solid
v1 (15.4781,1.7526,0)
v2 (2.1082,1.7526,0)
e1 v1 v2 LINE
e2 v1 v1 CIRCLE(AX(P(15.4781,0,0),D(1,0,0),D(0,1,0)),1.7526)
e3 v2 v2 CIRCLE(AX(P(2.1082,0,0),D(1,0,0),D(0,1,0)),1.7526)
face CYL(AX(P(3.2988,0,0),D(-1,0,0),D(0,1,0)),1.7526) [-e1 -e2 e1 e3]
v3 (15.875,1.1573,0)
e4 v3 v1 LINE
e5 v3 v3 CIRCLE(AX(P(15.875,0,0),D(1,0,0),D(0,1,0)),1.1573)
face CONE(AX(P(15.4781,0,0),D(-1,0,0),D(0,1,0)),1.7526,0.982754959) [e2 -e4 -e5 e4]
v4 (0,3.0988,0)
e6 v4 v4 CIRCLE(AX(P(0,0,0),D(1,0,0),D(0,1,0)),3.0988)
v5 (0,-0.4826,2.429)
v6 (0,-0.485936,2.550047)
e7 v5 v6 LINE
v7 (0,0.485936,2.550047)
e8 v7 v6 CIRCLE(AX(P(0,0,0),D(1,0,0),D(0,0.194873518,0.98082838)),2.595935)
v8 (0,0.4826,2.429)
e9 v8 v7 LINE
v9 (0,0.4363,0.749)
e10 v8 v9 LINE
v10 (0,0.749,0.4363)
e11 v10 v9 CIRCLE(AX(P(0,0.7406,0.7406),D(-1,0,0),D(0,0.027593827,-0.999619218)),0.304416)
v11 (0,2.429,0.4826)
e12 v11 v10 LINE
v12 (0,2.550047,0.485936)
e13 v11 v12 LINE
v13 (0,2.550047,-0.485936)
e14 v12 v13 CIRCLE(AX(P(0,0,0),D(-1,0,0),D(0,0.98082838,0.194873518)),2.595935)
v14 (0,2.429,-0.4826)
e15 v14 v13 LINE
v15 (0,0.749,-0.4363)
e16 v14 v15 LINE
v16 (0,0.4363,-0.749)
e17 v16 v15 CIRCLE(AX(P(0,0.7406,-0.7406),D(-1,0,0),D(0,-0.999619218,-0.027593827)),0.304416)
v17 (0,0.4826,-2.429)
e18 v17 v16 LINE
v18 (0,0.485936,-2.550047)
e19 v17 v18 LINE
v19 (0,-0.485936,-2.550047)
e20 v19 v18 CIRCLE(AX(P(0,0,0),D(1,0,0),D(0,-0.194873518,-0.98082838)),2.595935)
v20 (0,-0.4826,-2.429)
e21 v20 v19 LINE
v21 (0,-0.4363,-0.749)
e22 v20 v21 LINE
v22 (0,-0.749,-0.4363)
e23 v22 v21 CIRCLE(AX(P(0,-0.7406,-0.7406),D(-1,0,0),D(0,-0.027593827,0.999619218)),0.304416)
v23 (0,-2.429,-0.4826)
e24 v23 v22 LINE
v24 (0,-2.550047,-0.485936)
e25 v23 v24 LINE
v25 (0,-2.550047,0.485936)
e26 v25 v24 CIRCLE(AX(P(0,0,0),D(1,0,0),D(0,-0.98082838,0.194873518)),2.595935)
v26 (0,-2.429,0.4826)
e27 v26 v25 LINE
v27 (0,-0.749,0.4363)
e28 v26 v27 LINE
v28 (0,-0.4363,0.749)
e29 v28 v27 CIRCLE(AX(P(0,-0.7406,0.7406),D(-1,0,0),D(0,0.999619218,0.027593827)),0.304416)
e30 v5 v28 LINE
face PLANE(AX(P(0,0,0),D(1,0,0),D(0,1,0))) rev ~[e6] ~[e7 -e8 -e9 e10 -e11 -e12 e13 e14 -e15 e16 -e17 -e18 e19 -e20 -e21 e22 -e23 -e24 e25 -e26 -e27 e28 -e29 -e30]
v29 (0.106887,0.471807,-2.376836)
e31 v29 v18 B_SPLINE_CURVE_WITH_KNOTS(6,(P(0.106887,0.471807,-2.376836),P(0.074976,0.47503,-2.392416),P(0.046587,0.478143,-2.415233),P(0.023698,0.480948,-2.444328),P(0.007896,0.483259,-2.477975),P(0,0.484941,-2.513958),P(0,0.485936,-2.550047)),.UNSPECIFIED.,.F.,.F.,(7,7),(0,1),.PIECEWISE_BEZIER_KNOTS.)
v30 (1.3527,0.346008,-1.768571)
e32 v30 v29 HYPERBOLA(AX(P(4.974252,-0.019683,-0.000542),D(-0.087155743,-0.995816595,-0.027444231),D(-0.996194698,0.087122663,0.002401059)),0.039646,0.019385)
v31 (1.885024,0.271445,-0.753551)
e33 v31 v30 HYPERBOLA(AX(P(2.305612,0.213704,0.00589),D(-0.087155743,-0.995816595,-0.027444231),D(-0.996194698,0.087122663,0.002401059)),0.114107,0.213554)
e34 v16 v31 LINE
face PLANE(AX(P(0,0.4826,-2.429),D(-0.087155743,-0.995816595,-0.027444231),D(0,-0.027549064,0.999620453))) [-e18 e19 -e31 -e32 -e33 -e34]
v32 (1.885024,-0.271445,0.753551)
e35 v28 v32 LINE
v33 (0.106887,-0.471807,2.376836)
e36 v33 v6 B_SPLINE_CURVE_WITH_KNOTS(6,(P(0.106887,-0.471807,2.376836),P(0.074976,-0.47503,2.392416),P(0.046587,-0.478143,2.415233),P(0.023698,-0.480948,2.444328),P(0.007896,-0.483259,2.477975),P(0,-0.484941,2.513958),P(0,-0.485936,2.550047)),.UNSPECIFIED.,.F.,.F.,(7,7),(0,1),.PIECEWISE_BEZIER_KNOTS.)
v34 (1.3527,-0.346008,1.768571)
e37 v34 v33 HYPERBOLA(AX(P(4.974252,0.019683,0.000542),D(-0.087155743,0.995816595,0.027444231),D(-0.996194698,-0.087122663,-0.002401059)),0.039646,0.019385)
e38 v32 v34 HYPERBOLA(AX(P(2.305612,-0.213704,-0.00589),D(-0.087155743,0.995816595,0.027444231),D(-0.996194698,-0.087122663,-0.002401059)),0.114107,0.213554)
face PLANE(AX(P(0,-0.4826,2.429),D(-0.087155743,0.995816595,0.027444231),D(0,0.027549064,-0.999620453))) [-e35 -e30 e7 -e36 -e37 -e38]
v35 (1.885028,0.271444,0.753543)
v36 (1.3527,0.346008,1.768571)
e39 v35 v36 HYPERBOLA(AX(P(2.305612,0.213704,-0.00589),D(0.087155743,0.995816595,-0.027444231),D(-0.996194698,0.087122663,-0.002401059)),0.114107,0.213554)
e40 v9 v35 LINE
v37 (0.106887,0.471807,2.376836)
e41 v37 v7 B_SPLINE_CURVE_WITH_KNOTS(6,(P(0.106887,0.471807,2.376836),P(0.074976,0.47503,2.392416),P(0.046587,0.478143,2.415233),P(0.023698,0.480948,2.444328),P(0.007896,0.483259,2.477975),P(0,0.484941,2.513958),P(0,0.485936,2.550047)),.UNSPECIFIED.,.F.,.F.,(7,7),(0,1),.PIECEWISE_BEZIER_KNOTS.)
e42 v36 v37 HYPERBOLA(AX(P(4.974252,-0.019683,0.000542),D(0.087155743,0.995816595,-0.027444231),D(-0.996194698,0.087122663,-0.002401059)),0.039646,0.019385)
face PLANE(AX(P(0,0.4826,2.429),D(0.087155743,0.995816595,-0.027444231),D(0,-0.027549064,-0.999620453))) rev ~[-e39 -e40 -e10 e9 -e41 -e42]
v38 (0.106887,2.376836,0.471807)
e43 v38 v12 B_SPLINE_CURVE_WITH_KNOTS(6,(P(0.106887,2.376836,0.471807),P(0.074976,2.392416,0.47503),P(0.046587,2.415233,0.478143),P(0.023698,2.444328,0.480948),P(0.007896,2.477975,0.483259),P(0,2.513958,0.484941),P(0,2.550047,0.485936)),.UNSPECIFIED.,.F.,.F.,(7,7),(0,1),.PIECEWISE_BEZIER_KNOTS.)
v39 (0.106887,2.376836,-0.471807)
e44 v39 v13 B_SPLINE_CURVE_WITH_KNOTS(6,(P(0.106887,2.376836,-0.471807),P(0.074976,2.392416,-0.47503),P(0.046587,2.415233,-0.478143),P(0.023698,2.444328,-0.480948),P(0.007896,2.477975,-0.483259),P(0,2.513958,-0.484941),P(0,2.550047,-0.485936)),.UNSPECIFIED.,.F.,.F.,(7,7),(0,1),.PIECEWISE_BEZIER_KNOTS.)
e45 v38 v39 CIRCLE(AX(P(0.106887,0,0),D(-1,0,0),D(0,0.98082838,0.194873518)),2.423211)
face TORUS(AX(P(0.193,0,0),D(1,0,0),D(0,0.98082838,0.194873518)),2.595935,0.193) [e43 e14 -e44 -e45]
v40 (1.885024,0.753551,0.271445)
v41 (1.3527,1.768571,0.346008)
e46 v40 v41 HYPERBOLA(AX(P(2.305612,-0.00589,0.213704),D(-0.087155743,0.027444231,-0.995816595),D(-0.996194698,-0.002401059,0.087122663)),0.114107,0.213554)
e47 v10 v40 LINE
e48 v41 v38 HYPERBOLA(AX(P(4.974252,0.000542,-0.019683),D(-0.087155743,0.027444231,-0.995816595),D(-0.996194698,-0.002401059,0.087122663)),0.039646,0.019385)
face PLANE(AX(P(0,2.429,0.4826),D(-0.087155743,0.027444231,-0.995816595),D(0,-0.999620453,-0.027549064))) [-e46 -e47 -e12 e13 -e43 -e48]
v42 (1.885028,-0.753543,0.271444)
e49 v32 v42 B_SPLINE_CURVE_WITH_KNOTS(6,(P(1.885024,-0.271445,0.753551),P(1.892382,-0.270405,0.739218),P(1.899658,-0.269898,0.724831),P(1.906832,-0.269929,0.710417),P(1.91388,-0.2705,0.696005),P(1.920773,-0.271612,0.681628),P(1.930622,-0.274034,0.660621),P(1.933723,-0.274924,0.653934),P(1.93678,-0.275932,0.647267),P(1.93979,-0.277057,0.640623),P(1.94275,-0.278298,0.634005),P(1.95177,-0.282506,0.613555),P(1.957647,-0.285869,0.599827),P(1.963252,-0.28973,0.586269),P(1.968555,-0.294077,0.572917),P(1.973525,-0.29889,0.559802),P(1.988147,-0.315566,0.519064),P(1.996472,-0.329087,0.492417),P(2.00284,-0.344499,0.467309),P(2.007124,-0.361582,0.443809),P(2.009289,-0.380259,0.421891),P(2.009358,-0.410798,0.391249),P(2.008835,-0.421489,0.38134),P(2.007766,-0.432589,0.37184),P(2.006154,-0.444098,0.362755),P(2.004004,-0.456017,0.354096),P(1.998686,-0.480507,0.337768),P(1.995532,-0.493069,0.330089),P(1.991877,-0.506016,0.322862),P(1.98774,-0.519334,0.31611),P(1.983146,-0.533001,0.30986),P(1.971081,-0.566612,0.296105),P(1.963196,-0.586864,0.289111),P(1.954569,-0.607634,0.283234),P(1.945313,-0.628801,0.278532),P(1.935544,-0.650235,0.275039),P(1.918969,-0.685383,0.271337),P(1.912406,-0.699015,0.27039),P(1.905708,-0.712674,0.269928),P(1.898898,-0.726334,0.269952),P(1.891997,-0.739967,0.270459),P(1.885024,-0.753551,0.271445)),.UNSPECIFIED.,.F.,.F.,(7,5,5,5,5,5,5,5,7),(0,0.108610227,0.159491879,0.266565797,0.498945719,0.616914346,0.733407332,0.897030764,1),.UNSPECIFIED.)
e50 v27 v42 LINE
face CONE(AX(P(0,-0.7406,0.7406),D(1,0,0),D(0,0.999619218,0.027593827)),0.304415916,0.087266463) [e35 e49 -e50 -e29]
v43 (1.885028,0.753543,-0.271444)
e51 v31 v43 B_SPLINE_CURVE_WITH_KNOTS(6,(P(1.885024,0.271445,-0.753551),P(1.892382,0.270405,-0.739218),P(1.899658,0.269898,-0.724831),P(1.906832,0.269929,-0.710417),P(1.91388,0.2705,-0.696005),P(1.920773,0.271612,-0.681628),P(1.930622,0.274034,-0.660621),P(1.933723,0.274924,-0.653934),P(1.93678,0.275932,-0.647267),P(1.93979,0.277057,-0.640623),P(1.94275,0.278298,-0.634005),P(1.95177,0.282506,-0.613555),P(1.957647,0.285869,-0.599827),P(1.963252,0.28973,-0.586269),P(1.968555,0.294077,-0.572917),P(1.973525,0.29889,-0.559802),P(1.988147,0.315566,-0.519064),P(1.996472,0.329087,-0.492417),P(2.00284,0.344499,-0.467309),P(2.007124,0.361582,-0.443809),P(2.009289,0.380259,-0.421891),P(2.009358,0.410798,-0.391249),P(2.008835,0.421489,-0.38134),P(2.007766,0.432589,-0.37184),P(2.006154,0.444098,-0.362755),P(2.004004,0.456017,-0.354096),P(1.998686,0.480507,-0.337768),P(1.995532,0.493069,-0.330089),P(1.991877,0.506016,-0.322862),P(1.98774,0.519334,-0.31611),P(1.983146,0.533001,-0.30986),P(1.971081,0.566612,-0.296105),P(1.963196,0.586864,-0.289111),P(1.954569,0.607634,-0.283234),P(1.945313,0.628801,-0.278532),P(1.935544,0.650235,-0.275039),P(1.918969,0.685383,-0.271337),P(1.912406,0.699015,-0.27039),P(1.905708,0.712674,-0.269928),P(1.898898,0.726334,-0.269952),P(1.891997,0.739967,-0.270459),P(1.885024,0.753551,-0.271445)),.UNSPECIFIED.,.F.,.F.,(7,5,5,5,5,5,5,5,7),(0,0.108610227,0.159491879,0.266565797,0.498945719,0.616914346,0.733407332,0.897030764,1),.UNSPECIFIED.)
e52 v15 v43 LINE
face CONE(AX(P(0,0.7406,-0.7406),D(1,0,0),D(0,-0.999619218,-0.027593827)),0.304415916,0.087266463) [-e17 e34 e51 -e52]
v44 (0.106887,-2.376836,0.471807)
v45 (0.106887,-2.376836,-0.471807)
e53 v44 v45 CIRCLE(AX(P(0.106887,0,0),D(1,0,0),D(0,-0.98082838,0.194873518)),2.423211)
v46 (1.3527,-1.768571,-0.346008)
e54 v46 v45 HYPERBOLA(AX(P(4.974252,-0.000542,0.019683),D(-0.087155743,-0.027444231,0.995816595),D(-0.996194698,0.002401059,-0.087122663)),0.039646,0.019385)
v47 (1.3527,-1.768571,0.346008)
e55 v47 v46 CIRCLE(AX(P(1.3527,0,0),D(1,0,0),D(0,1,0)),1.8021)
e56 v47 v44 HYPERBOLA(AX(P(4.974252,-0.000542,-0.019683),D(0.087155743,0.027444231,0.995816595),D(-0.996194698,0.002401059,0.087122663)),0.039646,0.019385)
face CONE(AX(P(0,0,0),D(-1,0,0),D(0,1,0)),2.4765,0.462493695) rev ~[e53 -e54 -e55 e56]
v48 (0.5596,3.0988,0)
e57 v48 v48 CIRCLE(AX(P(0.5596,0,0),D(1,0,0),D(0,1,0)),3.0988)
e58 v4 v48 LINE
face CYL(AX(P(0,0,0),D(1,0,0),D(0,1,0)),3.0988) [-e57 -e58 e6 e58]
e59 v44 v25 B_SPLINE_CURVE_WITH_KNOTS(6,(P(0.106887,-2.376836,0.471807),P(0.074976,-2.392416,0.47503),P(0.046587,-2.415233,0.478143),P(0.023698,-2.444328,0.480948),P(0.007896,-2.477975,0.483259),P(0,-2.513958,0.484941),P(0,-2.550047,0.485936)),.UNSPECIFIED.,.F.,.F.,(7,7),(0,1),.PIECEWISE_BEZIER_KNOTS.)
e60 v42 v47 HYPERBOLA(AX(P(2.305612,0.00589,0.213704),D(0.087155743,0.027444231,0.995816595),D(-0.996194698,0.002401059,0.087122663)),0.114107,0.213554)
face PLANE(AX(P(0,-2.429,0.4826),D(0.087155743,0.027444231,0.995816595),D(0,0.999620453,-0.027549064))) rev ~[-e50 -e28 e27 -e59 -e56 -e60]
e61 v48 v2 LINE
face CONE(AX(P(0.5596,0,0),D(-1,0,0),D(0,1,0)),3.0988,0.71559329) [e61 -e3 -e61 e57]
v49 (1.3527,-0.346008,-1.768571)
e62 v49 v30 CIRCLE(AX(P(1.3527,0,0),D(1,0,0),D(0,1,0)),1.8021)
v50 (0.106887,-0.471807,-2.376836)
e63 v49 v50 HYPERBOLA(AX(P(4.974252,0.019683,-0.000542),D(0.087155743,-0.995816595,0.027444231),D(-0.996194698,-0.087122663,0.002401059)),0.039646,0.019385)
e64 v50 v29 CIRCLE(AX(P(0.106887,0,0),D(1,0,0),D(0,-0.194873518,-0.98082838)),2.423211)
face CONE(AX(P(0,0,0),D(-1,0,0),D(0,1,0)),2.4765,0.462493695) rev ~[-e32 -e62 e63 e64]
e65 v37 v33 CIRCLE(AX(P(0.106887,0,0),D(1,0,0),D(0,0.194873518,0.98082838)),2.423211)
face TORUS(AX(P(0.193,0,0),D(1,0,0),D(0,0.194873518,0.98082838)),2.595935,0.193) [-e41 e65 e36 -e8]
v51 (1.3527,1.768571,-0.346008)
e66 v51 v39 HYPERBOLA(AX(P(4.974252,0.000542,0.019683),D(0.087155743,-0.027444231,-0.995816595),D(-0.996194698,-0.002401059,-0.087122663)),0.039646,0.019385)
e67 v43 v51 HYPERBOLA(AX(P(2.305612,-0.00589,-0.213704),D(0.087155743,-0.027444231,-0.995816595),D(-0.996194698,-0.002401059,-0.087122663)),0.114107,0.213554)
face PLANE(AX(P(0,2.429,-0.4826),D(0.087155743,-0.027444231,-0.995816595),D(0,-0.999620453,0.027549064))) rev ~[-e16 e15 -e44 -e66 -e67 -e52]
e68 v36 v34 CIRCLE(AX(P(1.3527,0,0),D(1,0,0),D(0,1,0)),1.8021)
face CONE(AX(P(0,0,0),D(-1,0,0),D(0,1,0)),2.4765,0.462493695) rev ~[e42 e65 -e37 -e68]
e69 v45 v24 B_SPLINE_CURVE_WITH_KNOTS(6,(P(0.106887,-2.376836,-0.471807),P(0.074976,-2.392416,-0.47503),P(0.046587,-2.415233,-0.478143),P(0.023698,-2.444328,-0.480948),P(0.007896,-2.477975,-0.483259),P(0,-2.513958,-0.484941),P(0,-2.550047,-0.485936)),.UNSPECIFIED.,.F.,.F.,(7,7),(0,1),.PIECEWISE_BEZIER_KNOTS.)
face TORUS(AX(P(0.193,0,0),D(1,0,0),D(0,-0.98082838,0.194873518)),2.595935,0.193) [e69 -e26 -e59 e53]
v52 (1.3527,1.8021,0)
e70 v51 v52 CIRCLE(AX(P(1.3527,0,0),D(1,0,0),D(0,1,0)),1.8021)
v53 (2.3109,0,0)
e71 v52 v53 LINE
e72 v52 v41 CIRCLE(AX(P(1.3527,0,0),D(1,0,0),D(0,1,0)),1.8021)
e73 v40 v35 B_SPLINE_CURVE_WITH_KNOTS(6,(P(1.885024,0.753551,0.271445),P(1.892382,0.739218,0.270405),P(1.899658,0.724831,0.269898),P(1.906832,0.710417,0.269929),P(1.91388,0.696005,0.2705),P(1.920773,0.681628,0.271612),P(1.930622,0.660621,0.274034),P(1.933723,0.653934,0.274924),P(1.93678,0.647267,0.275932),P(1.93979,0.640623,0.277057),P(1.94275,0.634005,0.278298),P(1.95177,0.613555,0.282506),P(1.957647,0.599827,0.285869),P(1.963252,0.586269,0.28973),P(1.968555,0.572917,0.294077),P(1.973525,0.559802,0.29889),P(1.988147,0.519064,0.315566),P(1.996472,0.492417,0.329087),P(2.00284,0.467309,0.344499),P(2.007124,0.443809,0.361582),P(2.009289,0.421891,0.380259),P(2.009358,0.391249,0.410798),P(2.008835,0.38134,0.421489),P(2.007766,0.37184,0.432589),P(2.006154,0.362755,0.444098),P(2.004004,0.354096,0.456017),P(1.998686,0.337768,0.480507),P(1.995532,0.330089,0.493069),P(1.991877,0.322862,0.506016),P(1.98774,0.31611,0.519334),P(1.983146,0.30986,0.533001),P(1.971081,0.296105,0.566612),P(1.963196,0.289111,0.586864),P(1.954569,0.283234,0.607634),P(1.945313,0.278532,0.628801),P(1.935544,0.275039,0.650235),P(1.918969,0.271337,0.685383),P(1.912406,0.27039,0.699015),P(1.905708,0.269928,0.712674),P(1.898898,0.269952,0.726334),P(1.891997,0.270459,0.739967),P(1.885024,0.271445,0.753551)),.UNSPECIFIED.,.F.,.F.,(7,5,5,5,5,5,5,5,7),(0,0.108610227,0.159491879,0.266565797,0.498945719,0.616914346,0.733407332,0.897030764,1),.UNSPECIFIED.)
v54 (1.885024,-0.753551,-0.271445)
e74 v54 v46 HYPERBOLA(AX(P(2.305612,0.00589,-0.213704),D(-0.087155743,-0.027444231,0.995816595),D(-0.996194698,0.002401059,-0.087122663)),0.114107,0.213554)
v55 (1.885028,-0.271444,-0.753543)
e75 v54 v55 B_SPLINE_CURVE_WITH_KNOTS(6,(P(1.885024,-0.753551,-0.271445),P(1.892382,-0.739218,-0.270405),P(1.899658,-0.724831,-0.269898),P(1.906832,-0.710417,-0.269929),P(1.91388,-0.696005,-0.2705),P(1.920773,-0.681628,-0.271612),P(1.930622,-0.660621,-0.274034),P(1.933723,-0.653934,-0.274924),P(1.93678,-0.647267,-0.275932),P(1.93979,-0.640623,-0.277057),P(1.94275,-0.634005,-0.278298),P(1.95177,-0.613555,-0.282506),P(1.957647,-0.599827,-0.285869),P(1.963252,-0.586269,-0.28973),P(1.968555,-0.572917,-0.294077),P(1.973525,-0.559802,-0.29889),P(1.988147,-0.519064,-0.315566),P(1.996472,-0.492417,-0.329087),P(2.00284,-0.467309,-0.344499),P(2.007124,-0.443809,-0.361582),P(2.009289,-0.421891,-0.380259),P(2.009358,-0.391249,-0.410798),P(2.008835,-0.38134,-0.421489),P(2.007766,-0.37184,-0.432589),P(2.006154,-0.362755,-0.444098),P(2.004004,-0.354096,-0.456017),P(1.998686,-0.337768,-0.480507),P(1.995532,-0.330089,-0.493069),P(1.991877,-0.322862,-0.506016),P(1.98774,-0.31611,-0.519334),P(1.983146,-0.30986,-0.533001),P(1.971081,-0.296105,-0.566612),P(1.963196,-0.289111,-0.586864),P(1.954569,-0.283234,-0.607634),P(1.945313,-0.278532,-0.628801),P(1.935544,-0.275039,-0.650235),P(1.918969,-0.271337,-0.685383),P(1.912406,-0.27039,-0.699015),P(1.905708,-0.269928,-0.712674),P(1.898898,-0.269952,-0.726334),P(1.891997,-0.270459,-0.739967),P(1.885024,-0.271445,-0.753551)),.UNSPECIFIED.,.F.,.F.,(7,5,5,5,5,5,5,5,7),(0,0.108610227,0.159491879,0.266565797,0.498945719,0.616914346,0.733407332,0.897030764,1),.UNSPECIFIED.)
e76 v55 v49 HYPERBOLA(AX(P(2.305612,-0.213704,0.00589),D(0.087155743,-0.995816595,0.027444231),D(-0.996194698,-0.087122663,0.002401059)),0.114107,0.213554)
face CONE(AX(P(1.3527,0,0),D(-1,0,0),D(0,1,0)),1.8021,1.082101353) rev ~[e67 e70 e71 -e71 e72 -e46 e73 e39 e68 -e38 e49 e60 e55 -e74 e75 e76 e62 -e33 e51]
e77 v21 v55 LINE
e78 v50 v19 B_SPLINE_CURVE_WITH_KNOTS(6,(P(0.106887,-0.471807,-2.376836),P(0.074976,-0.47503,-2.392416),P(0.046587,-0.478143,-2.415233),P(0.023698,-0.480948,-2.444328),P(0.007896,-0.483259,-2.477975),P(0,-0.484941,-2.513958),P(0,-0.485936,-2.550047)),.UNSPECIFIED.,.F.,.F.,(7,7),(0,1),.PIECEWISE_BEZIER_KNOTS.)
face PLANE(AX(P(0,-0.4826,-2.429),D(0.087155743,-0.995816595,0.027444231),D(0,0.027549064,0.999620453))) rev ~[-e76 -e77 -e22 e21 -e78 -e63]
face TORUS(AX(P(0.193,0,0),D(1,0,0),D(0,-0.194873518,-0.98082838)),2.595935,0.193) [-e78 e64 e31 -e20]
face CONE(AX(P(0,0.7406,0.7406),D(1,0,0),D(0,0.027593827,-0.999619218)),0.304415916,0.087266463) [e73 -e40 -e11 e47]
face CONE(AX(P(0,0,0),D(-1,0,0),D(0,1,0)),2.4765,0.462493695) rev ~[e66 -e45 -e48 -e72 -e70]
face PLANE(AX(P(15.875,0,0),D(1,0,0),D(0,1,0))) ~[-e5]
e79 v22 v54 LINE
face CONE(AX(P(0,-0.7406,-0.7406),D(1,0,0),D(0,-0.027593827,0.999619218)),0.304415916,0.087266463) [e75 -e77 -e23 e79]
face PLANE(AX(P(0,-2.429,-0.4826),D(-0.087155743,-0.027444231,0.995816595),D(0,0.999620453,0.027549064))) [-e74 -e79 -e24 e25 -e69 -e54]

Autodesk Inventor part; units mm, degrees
ref_plane "YZ Plane" through (0, 0, 0) normal (1, 0, 0) x (0, 1, 0)
ref_plane "XZ Plane" through (0, 0, 0) normal (0, 1, 0) x (-1, 0, 0)
sketch "Sketch1" plane through (0, 0, 0) normal (0, 0, 1) x (1, 0, 0)
  line L0 (2.3109, 0) -> (15.875, 0)
  line L1 (15.875, 0) -> (15.875, 1.7526)
  line L2 (15.875, 1.7526) -> (4.0926, 1.7526)
  line L3 (4.0926, 1.7526) -> (3.2988, 1.7526)
  line L4 (3.2988, 1.7526) -> (2.1082, 1.7526)
  line L5 (0, 3.0988) -> (0, 2.4765)
  line L6 (0, 2.4765) -> (1.3527, 1.8021)
  line L7 (1.3527, 1.8021) -> (2.3109, 0)
  line L8 (-3.175, 0) -> (19.05, 0) projected
  line L9 (0, -0.6198) -> (0, 3.7186) projected
  line L10 (0, 3.0988) -> (0.5596, 3.0988)
  line L11 (0.5596, 3.0988) -> (2.1082, 1.7526)
  line L12 (4.0926, 1.7526) -> (2.1082, 1.7526) construction
  dimension "d1" = 11.7824
  dimension "d2" = 3.5052
  dimension "d3" = 3.5052
  dimension "d4" = 4.953
  dimension "d5" = 26.5
  dimension "d6" = 62
  dimension "d7" = 2.3109
  dimension "d8" = 0.7937
  dimension "d12" = 6.1976
  dimension "d13" = 41
  dimension "d15" = 15.875
  dimension "d24" = 2.1082
revolve "Body" add sketch "Sketch1" angle 360 about axis through (2.3109, 0, 0) along (1, 0, 0) contours L7 L6 L5 L10 L11 L4 L3 L2 L1 L0
sketch "Sketch2" plane through (0, 0, 0) normal (-1, 0, 0) x (0, 0, 1)
  line L0 (0, 2.4765) -> (0, 0) construction
  line L1 (0, 0) -> (2.4765, 0) construction
  arc A0 (0.743, 0) -> (0, 0.7429) centre (0, 0) ccw construction
  arc A1 (0.8668, 0) -> (0, 0.8668) centre (0, 0) ccw construction
  arc A2 (2.429, 0.4826) -> (0.4826, 2.429) centre (0, 0) ccw
  line L2 (0, 0) -> (1.7511, 1.7511) construction
  line L3 (0.4826, 2.429) -> (0.4363, 0.749)
  line L4 (2.429, 0.4826) -> (0.749, 0.4363)
  arc A3 (0.4826, 2.429) -> (0, 2.4765) centre (0, 0) ccw
  arc A4 (2.4765, 0) -> (2.429, 0.4826) centre (0, 0) ccw
  line L5 (0, -4.3383) -> (0, 4.3383) projected
  line L6 (-4.3383, 0) -> (4.3383, 0) projected
  arc A5 (0.4826, -2.429) -> (2.429, -0.4826) centre (0, 0) ccw
  line L7 (0.4826, -2.429) -> (0.4363, -0.749)
  line L8 (2.429, -0.4826) -> (0.749, -0.4363)
  arc A6 (0, -2.4765) -> (0.4826, -2.429) centre (0, 0) ccw
  arc A7 (2.429, -0.4826) -> (2.4765, 0) centre (0, 0) ccw
  arc A8 (-0.4826, 2.429) -> (-2.429, 0.4826) centre (0, 0) ccw
  line L9 (-0.4826, 2.429) -> (-0.4363, 0.749)
  line L10 (-2.429, 0.4826) -> (-0.749, 0.4363)
  arc A9 (0, 2.4765) -> (-0.4826, 2.429) centre (0, 0) ccw
  arc A10 (-2.429, 0.4826) -> (-2.4765, 0) centre (0, 0) ccw
  arc A11 (-0.4826, -2.429) -> (0, -2.4765) centre (0, 0) ccw
  arc A12 (-2.429, -0.4826) -> (-0.4826, -2.429) centre (0, 0) ccw
  arc A13 (-2.4765, 0) -> (-2.429, -0.4826) centre (0, 0) ccw
  line L11 (-2.429, -0.4826) -> (-0.749, -0.4363)
  line L12 (-0.4826, -2.429) -> (-0.4363, -0.749)
  arc A14 (0.4363, 0.749) -> (0.749, 0.4363) centre (0.7406, 0.7406) ccw
  arc A15 (0.749, -0.4363) -> (0.4363, -0.749) centre (0.7406, -0.7406) ccw
  arc A16 (-0.749, 0.4363) -> (-0.4363, 0.749) centre (-0.7406, 0.7406) ccw
  arc A17 (-0.4363, -0.749) -> (-0.749, -0.4363) centre (-0.7406, -0.7406) ccw
  point P0 (1.7511, -1.7511)
  point P1 (-1.7511, 1.7511)
  point P2 (-1.7511, -1.7511)
  dimension "d17" = 1.4859
  dimension "d18" = 1.7335
  dimension "d19" = 4.953
  dimension "d20" = 45
  dimension "d21" = 0.4826
extrude "Slot" add sketch "Sketch2" against normal up to next draft 5 contours L4 A14 L3 A2 | A5 L7 A15 L8 | L9 A16 L10 A8 | A12 L11 A17 L12
fillet "Fillet1" radius 0.193 4 edges at (0, 2.4765, 0) (0, 0, -2.4765) (0, -2.4765, 0) (0, 0, 2.4765)
thread "Thread" size "6-32 UNC" class "2A" standard "ANSI Unified Screw Threads" length 11.7824
chamfer "Chamfer1" distance 0.5953 distance2 0.3969 1 edges at (15.875, -1.7526, 0) measured on face at (15.875, 0.1597, 0.4211)
ref_plane "Work Plane2" through (3.35, 0, 0) normal (0, 0, -1) x (1, 0, 0)
equation "\"d1\" = GEL"
equation "\"d2\" = GD"
equation "\"d3\" = BDM"
equation "\"d4\" = SDM"
equation "\"d7\" = INTI"
equation "\"d8\" = GAL"
equation "\"d12\" = KOD"
equation "\"d13\" = 0.5 * SEWI"
equation "\"d15\" = NLG"
equation "\"d24\" = KOH"
equation "\"d17\" = 0.3 * SDM"
equation "\"d18\" = 0.35 * SDM"
equation "\"d19\" = SDM"
equation "\"d21\" = 0.5 * SBR"
equation "\"d23\" = 0.2 * SBR"
equation "\"d10\" = GEL"
equation "\"d25\" = -0.5 * SPD + 0.5 * GD"
equation "\"d26\" = 0.5 * GAL"
equation "\"NLG\" = 15.875"
equation "\"GEL\" = 11.78242"
equation "\"GAL\" = 0.79375"
equation "\"SPD\" = 2.31458"
equation "\"KOD\" = 6.1976"
equation "\"KOH\" = 2.1082"
equation "\"SBR\" = 0.9652"
equation "\"SDM\" = 4.953"
equation "\"GD\" = NND"
equation "\"BDM\" = NND"
equation "\"SEWI\" = 82deg"
equation "\"d9\" = SDM"
equation "\"GUL\" = 0.75 * GAL"
equation "\"TOA\" = 30deg"
equation "\"THREADDIA\" = 3.5052"
equation "\"NND\" = 3.5052"
equation "\"INTI1\" = 2.8702"
equation "\"GD1\" = SPD"
equation "\"INTI\" = 2.310879"
properties part number "ANSI B18.6.3 - 6-32 x 5/8, CRFCHMSTII(3)" material "Steel, Mild"
